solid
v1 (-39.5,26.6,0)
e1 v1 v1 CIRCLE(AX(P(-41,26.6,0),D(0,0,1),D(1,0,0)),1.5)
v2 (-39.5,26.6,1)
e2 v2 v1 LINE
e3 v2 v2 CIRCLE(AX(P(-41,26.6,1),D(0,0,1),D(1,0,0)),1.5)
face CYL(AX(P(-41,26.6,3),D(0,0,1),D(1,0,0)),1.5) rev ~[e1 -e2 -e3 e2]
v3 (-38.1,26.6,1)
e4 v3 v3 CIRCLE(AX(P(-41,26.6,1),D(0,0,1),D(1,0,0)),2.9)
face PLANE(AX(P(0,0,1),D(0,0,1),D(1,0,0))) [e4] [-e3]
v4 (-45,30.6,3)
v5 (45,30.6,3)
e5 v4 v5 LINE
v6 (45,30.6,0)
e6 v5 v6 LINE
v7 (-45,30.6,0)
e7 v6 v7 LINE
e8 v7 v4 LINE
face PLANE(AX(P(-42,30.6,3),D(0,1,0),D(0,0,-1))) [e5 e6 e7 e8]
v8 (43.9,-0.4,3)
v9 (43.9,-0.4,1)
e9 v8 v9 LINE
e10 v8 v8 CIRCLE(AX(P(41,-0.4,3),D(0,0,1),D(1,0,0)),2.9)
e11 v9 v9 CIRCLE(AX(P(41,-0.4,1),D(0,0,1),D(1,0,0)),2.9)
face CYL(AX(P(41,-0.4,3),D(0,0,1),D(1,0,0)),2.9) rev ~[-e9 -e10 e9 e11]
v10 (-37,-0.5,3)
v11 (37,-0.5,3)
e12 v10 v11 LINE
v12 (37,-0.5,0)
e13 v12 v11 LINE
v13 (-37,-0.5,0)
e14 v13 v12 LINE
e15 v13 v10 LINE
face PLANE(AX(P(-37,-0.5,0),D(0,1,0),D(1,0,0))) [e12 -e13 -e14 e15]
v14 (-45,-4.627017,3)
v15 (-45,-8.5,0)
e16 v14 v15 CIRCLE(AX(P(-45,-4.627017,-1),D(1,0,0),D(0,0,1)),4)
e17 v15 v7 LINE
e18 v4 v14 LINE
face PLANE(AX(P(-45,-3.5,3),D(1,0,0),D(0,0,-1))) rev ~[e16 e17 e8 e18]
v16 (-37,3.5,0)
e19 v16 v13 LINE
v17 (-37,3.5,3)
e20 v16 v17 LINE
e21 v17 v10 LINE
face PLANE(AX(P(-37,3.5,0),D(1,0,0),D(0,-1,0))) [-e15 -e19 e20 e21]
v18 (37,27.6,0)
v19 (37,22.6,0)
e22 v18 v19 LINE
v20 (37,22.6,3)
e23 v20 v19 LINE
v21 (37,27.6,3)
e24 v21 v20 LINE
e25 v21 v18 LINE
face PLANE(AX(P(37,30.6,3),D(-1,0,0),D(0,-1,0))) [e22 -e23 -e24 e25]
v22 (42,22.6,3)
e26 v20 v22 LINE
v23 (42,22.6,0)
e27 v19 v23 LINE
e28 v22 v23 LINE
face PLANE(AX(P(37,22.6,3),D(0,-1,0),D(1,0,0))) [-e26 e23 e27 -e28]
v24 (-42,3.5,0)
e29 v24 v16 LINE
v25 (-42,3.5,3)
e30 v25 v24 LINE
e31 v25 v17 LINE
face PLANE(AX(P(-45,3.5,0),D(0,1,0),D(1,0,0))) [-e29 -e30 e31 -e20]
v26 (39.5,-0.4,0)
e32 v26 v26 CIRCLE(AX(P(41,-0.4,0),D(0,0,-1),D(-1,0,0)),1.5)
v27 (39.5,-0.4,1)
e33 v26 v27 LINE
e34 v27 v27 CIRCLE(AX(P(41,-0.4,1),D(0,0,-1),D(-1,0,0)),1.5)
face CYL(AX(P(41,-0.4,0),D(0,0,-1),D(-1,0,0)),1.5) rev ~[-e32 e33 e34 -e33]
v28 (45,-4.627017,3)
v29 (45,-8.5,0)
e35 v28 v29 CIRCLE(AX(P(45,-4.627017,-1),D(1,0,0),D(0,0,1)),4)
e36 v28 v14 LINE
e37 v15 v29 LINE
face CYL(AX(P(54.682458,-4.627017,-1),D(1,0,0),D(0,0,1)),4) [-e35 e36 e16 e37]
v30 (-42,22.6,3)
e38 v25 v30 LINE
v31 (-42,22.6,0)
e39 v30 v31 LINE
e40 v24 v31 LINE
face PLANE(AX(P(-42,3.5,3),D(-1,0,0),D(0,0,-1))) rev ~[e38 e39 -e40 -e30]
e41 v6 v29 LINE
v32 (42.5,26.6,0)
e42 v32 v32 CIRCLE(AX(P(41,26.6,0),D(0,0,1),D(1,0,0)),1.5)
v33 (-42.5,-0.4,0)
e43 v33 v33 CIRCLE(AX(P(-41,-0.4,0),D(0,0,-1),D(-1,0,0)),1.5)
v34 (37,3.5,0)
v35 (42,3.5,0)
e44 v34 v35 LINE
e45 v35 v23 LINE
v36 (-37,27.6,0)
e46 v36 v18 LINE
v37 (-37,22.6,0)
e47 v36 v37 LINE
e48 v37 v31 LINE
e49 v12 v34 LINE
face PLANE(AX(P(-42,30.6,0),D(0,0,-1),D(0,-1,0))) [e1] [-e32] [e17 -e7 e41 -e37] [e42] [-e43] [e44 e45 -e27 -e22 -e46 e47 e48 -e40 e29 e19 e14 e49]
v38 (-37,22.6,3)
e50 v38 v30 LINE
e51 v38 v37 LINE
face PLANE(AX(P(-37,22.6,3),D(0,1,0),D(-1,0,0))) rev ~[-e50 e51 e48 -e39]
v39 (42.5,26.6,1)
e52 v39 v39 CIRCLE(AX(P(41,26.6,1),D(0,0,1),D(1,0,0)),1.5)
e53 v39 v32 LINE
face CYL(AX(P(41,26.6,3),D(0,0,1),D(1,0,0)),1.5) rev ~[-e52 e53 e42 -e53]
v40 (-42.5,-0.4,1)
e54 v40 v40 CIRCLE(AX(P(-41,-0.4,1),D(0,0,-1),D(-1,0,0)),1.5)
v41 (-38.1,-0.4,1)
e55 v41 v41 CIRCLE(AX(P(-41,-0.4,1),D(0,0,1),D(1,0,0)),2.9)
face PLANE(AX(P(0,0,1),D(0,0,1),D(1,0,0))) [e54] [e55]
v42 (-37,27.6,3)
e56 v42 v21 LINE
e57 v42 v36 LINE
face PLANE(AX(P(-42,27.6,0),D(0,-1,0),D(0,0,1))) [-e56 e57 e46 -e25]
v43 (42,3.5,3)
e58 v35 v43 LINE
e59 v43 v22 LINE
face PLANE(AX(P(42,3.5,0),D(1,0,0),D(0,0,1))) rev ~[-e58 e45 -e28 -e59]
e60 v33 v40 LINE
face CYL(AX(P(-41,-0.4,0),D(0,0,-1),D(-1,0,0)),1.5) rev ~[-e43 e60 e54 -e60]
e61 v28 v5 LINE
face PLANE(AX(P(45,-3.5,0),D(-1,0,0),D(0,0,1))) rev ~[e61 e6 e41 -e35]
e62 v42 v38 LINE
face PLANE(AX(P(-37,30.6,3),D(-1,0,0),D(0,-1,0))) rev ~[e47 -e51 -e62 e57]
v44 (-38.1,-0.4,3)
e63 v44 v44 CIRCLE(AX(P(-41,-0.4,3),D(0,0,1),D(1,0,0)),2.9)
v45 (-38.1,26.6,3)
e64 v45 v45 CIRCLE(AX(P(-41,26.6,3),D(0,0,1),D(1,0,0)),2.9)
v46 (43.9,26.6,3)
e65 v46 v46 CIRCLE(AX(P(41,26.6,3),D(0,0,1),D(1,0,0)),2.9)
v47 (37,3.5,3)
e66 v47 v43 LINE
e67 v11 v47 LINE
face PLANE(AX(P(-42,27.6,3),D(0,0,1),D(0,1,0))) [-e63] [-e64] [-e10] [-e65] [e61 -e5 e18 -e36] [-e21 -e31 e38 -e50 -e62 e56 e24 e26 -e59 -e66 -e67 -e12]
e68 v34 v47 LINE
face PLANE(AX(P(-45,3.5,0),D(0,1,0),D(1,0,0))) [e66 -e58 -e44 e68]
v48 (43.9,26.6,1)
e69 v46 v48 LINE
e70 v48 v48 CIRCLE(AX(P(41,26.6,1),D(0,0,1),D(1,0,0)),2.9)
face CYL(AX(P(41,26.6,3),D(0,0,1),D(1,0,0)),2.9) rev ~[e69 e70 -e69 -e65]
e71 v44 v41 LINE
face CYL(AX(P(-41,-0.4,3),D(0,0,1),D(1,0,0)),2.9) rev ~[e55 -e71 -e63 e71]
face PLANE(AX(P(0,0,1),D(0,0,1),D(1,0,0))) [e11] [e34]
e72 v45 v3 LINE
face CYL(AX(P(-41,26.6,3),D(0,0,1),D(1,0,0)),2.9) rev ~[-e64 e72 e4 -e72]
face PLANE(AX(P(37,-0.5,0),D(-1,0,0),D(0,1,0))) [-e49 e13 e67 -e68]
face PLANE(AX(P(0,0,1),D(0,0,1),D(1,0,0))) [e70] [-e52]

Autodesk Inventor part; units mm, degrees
ref_plane "YZ Plane" through (0, 0, 0) normal (1, 0, 0) x (0, 1, 0)
ref_plane "XZ Plane" through (0, 0, 0) normal (0, 1, 0) x (-1, 0, 0)
ref_plane "XY Plane" through (0, 0, 0) normal (0, 0, 1) x (1, 0, 0)
sketch "スケッチ1" plane through (0, 0, 0) normal (0, 0, 1) x (1, 0, 0)
  line L0 (-45, 3.5) -> (45, 3.5)
  line L1 (45, 3.5) -> (45, -3.5)
  line L2 (45, -3.5) -> (-45, -3.5)
  line L3 (-45, -3.5) -> (-45, 3.5)
  line L4 (-45, 3.5) -> (45, -3.5) construction
  line L5 (45, 3.5) -> (-45, -3.5) construction
  point P0 (0, 0)
  dimension "d0" = 90
  dimension "d1" = 7
extrude "押し出し1" add sketch "スケッチ1" along normal blind 3
sketch "スケッチ2" plane through (0, 0, 3) normal (0, 0, 1) x (1, 0, 0)
  circle A0 centre (-41, -0.4) radius 2.9
  circle A1 centre (41, -0.4) radius 2.9
  line L0 (45, 3.5) -> (-45, 3.5) projected
  line L1 (45, -3.5) -> (45, 3.5) projected
  point P0 (0, 0)
  dimension "d4" = 5.8
  dimension "d5" = 5.8
  dimension "d7" = 3.9
  dimension "d8" = 3.9
  dimension "d9" = 82
  dimension "d10" = 4
extrude "押し出し2" cut sketch "スケッチ2" against normal blind 2
sketch "スケッチ3" plane through (0, 0, 0) normal (0, 0, -1) x (-1, 0, 0)
  circle A0 centre (41, -0.4) radius 1.5
  circle A1 centre (-41, -0.4) radius 1.5
  line L0 (45, -3.5) -> (45, 3.5) projected
  line L1 (-45, 3.5) -> (-45, -3.5) projected
  line L2 (45, 3.5) -> (-45, 3.5) projected
  point P0 (0, 0)
  dimension "d13" = 3
  dimension "d14" = 3
  dimension "d15" = 4
  dimension "d16" = 4
  dimension "d17" = 3.9
  dimension "d18" = 3.9
extrude "押し出し3" cut sketch "スケッチ3" against normal blind 2
sketch "スケッチ4" plane through (-45, -3.5, 0) normal (0, -1, 0) x (1, 0, 0)
  line L0 (0, 0) -> (90, 0)
  line L1 (90, 0) -> (90, 3)
  line L2 (90, 3) -> (0, 3)
  line L3 (0, 3) -> (0, 0)
  point P0 (45, 0)
extrude "押し出し4" add sketch "スケッチ4" along normal blind 5
fillet "フィレット1" radius 4 1 edges at (0, -8.5, 3)
sketch "スケッチ6" plane through (0, 0, 0) normal (0, 0, -1) x (-1, 0, 0)
  line L0 (37, -0.5) -> (-37, -0.5)
  line L1 (-37, -0.5) -> (-37, 3.5)
  line L2 (-37, 3.5) -> (37, 3.5)
  line L3 (37, 3.5) -> (37, -0.5)
  line L4 (45, -8.5) -> (45, 3.5) projected
  line L5 (45, 3.5) -> (-45, 3.5) projected
  point P0 (0, 0)
  dimension "d24" = 74
  dimension "d25" = 8
  dimension "d26" = 0
  dimension "d27" = 4
extrude "押し出し5" cut sketch "スケッチ6" against normal blind 10
sketch "スケッチ7" plane through (45, 3.5, 3) normal (0, 1, 0) x (1, 0, 0)
  line L0 (0, 3) -> (-3, 3)
  line L1 (-3, 3) -> (-3, 0)
  line L2 (-3, 0) -> (0, 0)
  line L3 (0, 0) -> (0, 3)
  line L4 (-90, 0) -> (-87, 0)
  line L5 (-87, 0) -> (-87, 3)
  line L6 (-87, 3) -> (-90, 3)
  line L7 (-90, 3) -> (-90, 0)
  point P0 (-45, 3)
  dimension "d30" = 3
  dimension "d31" = 3
  dimension "d32" = 3
  dimension "d33" = 3
extrude "押し出し6" add sketch "スケッチ7" along normal blind 27.1
sketch "スケッチ8" plane through (-42, 3.5, 3) normal (1, 0, 0) x (0, 0, -1)
  line L0 (0, 27.1) -> (3, 27.1)
  line L1 (3, 27.1) -> (3, 24.1)
  line L2 (3, 24.1) -> (0, 24.1)
  line L3 (0, 24.1) -> (0, 27.1)
  point P0 (3, -3.5)
  dimension "d36" = 3
  dimension "d37" = 3
extrude "押し出し7" add sketch "スケッチ8" along normal blind 86
sketch "スケッチ9" plane through (0, 0, 3) normal (0, 0, 1) x (1, 0, 0)
  line L0 (-45, 30.6) -> (-37, 30.6)
  line L1 (-37, 30.6) -> (-37, 22.6)
  line L2 (-37, 22.6) -> (-45, 22.6)
  line L3 (-45, 22.6) -> (-45, 30.6)
  line L4 (45, 30.6) -> (37, 30.6)
  line L5 (37, 30.6) -> (37, 22.6)
  line L6 (37, 22.6) -> (45, 22.6)
  line L7 (45, 22.6) -> (45, 30.6)
  point P0 (0, 0)
  dimension "d40" = 8
  dimension "d41" = 8
  dimension "d42" = 8
  dimension "d43" = 8
extrude "押し出し8" add sketch "スケッチ9" against normal blind 3
sketch "スケッチ10" plane through (0, 0, 3) normal (0, 0, 1) x (1, 0, 0)
  circle A0 centre (-41, 26.6) radius 1.5
  circle A1 centre (41, 26.6) radius 1.5
  line L0 (-45, 30.6) -> (45, 30.6) projected
  line L1 (-45, -4.627) -> (-45, 30.6) projected
  line L2 (45, 30.6) -> (45, -4.627) projected
  point P0 (0, 0)
  dimension "d46" = 4
  dimension "d47" = 4
  dimension "d50" = 3
  dimension "d51" = 3
  dimension "d52" = 4
  dimension "d53" = 4
extrude "押し出し9" cut sketch "スケッチ10" against normal blind 3
sketch "スケッチ11" plane through (0, 0, 3) normal (0, 0, 1) x (1, 0, 0)
  circle A0 centre (-41, 26.6) radius 1.5 projected
  circle A1 centre (-41, 26.6) radius 2.9
  circle A2 centre (41, 26.6) radius 2.9
  line L0 (-45, 30.6) -> (45, 30.6) projected
  line L1 (45, 30.6) -> (45, -4.627) projected
  point P0 (0, 0)
  dimension "d56" = 5.8
  dimension "d57" = 5.8
  dimension "d58" = 4
  dimension "d60" = 4
extrude "押し出し10" cut sketch "スケッチ11" against normal blind 2
properties part number "LineTraceCoverFlont"
